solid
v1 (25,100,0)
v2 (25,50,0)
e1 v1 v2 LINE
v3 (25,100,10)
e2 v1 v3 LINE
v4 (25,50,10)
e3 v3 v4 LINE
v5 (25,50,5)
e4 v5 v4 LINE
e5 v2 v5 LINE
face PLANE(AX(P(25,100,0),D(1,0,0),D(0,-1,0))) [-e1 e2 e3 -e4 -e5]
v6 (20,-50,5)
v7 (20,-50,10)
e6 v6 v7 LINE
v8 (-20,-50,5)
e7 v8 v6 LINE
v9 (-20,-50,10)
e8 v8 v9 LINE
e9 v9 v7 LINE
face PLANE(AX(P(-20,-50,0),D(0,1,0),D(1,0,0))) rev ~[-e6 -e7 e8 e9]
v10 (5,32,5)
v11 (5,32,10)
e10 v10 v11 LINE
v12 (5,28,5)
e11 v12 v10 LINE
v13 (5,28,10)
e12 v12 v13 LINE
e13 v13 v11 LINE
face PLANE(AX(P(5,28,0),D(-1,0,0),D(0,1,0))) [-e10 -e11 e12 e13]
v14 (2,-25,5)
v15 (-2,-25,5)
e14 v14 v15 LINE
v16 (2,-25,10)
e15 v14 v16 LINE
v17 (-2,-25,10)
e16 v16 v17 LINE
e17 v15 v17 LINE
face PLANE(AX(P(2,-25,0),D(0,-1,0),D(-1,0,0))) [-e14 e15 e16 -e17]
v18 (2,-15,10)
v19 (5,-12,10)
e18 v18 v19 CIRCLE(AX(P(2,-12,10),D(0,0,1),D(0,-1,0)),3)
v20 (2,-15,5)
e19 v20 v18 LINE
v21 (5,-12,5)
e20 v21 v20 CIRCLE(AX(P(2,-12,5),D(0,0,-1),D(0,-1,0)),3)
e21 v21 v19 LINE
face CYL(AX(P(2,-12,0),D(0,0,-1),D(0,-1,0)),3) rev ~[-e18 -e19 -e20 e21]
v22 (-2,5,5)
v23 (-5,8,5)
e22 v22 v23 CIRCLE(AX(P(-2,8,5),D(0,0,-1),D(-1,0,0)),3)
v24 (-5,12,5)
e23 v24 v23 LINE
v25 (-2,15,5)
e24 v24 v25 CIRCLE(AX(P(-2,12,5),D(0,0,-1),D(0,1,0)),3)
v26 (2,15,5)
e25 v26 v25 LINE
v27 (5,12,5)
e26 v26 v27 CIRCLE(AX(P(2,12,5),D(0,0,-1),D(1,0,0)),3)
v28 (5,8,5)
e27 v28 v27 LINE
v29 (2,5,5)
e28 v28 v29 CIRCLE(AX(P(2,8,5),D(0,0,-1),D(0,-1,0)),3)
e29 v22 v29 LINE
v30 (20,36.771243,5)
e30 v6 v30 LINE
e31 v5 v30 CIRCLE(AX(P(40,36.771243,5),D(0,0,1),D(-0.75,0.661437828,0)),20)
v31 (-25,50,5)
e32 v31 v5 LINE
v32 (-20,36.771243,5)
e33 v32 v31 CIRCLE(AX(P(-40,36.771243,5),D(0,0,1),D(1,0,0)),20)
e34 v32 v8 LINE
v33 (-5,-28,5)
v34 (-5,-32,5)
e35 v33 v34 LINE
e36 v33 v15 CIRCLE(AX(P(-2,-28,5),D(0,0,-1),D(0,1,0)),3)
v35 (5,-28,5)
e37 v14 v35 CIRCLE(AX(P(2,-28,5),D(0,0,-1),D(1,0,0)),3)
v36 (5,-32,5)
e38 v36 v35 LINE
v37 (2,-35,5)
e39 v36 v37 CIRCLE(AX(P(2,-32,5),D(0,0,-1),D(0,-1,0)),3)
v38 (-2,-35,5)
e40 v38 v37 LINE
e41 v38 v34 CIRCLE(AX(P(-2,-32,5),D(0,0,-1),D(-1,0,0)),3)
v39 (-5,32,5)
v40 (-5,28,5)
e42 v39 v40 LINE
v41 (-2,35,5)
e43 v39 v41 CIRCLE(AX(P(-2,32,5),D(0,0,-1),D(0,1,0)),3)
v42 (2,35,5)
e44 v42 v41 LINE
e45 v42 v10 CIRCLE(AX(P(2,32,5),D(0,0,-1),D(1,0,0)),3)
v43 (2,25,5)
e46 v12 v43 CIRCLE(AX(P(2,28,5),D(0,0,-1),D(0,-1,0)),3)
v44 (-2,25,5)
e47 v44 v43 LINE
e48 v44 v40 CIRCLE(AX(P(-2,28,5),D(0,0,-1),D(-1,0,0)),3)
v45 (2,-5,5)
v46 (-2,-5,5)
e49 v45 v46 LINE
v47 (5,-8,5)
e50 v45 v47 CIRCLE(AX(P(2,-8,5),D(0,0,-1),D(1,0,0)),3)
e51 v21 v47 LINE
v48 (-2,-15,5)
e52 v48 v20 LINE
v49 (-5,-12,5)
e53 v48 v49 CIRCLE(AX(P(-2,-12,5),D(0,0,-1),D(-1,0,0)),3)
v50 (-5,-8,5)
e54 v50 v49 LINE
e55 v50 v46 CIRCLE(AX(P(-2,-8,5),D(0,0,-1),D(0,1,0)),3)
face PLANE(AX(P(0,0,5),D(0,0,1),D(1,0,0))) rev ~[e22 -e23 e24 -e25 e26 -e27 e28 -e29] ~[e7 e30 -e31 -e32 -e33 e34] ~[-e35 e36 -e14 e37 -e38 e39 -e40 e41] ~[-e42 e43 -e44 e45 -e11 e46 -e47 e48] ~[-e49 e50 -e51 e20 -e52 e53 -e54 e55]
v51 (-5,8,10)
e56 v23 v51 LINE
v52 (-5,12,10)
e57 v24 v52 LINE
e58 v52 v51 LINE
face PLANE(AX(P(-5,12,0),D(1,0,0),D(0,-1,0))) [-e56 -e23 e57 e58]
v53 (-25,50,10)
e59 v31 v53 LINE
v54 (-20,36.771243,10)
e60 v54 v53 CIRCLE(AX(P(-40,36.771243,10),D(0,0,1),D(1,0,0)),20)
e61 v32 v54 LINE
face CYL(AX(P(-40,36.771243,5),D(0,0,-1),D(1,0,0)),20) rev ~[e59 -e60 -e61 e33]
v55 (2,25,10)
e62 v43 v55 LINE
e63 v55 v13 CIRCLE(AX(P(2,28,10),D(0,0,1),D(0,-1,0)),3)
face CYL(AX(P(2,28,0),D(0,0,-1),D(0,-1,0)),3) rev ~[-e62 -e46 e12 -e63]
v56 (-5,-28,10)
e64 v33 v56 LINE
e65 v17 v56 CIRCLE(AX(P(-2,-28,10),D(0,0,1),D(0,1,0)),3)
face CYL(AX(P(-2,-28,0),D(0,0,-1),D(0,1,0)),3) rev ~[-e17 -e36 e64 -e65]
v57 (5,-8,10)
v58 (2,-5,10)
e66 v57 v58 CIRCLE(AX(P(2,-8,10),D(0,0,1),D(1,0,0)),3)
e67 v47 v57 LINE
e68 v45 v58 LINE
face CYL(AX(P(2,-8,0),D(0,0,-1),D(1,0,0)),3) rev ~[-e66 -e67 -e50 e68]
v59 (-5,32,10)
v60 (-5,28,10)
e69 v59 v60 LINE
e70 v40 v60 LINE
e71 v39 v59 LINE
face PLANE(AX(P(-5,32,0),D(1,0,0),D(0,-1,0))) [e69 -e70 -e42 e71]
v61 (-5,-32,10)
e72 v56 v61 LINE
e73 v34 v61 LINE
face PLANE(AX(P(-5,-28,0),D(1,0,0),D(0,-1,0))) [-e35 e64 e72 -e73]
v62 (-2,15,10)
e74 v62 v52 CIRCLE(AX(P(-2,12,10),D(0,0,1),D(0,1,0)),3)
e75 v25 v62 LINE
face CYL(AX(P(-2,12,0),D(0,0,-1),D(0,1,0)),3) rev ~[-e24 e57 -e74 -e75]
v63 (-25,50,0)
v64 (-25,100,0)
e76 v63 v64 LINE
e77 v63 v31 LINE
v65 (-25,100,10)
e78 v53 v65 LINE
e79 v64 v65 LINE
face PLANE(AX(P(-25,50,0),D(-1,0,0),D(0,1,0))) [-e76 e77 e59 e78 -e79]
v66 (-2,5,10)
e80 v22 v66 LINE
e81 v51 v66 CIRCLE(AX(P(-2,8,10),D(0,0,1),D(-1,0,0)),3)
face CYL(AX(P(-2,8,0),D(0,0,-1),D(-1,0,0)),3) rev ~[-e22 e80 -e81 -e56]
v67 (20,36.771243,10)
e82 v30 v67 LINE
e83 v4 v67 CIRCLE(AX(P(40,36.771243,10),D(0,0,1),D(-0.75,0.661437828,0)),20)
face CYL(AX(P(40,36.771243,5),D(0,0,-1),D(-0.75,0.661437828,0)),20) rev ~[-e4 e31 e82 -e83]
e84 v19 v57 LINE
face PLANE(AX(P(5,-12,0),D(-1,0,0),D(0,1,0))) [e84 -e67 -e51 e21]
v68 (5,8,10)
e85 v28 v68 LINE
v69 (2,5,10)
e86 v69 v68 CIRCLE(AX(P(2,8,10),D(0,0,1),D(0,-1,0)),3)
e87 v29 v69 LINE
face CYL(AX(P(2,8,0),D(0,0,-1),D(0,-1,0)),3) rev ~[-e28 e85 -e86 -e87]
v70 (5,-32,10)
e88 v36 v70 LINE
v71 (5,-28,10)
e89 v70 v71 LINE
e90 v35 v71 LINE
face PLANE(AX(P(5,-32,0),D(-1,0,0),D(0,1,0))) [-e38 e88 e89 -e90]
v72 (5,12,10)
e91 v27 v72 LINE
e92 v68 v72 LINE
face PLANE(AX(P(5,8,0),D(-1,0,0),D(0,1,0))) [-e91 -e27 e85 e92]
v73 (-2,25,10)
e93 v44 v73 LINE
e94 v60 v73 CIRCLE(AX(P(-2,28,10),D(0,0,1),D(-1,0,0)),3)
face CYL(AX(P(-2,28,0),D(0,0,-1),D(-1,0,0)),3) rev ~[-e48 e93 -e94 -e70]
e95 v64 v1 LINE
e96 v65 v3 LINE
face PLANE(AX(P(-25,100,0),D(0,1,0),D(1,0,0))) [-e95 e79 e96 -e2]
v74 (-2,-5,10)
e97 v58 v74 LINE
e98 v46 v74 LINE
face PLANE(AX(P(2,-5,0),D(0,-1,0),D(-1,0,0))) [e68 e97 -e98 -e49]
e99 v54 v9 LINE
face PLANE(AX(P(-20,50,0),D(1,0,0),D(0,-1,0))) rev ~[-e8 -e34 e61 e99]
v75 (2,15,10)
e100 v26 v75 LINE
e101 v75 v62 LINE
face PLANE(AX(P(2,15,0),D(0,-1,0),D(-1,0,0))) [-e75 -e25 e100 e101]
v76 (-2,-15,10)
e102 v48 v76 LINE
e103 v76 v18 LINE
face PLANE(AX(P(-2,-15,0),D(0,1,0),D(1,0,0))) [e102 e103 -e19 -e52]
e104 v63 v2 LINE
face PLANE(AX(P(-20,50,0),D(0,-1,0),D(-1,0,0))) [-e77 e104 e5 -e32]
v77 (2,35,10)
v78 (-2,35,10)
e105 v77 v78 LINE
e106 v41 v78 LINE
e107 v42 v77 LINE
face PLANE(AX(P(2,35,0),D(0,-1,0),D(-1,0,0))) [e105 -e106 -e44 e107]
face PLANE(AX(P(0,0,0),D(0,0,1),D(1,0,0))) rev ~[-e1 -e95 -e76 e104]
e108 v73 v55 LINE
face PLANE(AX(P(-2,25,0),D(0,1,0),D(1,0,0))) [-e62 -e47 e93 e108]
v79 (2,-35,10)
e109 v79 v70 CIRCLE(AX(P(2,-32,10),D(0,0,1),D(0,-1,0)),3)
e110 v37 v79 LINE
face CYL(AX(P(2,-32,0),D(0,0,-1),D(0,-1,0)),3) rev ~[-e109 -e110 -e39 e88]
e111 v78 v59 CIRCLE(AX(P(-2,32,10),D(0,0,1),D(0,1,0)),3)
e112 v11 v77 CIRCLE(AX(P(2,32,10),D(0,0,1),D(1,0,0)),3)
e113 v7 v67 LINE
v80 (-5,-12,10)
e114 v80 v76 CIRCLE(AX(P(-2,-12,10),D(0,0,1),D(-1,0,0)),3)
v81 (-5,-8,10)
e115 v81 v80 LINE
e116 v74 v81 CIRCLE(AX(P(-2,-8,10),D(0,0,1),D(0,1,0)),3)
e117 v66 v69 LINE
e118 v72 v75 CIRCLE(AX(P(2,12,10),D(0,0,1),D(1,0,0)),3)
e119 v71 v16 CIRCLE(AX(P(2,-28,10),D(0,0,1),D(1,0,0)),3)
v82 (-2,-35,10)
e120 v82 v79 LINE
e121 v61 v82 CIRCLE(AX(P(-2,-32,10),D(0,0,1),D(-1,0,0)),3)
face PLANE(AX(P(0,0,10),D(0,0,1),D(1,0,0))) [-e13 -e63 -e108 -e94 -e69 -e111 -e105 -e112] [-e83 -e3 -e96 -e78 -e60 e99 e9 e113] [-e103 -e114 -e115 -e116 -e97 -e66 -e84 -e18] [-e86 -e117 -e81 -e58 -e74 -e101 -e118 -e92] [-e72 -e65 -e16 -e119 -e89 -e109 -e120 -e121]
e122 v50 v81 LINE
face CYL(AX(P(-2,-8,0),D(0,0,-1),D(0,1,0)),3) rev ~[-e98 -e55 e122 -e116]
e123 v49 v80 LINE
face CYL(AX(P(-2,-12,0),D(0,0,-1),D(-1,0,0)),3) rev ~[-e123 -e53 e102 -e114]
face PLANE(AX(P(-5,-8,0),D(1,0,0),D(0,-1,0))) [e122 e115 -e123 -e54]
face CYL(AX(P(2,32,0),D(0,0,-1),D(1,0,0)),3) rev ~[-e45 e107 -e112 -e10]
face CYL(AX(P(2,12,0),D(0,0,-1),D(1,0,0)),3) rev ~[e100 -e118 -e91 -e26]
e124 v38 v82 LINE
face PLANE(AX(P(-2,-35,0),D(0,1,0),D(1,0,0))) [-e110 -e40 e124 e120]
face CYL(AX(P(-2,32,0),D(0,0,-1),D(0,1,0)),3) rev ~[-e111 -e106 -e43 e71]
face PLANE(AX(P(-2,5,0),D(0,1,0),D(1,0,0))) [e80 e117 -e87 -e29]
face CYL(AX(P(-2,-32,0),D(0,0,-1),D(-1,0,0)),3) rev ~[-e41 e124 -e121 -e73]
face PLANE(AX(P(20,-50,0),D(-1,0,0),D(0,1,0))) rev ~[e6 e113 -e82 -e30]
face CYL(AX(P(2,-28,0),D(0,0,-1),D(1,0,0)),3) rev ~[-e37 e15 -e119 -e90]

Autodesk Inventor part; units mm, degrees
ref_plane "YZ Plane" through (0, 0, 0) normal (1, 0, 0) x (0, 1, 0)
ref_plane "XZ Plane" through (0, 0, 0) normal (0, 1, 0) x (-1, 0, 0)
ref_plane "XY Plane" through (0, 0, 0) normal (0, 0, 1) x (1, 0, 0)
sketch "Boceto1" plane through (0, 0, 0) normal (0, 0, 1) x (1, 0, 0)
  line L0 (-20, -50) -> (20, -50)
  line L1 (20, -50) -> (20, 50)
  line L2 (20, 50) -> (-20, 50)
  line L3 (-20, 50) -> (-20, -50)
  line L4 (-20, -50) -> (20, 50) construction
  line L5 (20, -50) -> (-20, 50) construction
  line L6 (-25, 100) -> (25, 100)
  line L7 (25, 100) -> (25, 50)
  line L8 (25, 50) -> (-25, 50)
  line L9 (-25, 50) -> (-25, 100)
  line L10 (-25, 100) -> (25, 50) construction
  line L11 (25, 100) -> (-25, 50) construction
  line L12 (-25, -50) -> (25, -50)
  line L13 (25, -50) -> (25, -100)
  line L14 (25, -100) -> (-25, -100)
  line L15 (-25, -100) -> (-25, -50)
  line L16 (-25, -50) -> (25, -100) construction
  line L17 (25, -50) -> (-25, -100) construction
  line L18 (0, 50) -> (0, 30) construction
  line L19 (0, 30) -> (0, 10) construction
  line L20 (0, 10) -> (0, -10) construction
  line L21 (0, -10) -> (0, -30) construction
  line L22 (0, -30) -> (0, -50) construction
  line L23 (0, 30) -> (0, 30) construction
  line L24 (0, 10) -> (0, 10) construction
  line L25 (0, -10) -> (0, -10) construction
  line L26 (0, -30) -> (0, -30) construction
  line L27 (2, 35) -> (-2, 35)
  line L28 (-5, 32) -> (-5, 28)
  line L29 (-2, 25) -> (2, 25)
  line L30 (5, 28) -> (5, 32)
  line L31 (5, 35) -> (-5, 25) construction
  line L32 (-5, 35) -> (5, 25) construction
  line L33 (2, 15) -> (-2, 15)
  line L34 (-5, 12) -> (-5, 8)
  line L35 (-2, 5) -> (2, 5)
  line L36 (5, 8) -> (5, 12)
  line L37 (5, 15) -> (-5, 5) construction
  line L38 (-5, 15) -> (5, 5) construction
  line L39 (2, -5) -> (-2, -5)
  line L40 (-5, -8) -> (-5, -12)
  line L41 (-2, -15) -> (2, -15)
  line L42 (5, -12) -> (5, -8)
  line L43 (5, -5) -> (-5, -15) construction
  line L44 (-5, -5) -> (5, -15) construction
  line L45 (2, -25) -> (-2, -25)
  line L46 (-5, -28) -> (-5, -32)
  line L47 (-2, -35) -> (2, -35)
  line L48 (5, -32) -> (5, -28)
  line L49 (5, -25) -> (-5, -35) construction
  line L50 (-5, -25) -> (5, -35) construction
  line L51 (0, 30) -> (0, 10) construction
  arc A0 (-2, 35) -> (-5, 32) centre (-2, 32) ccw
  arc A1 (5, 32) -> (2, 35) centre (2, 32) ccw
  arc A2 (2, 25) -> (5, 28) centre (2, 28) ccw
  arc A3 (-5, 28) -> (-2, 25) centre (-2, 28) ccw
  arc A4 (-2, 15) -> (-5, 12) centre (-2, 12) ccw
  arc A5 (-5, 8) -> (-2, 5) centre (-2, 8) ccw
  arc A6 (2, 5) -> (5, 8) centre (2, 8) ccw
  arc A7 (5, 12) -> (2, 15) centre (2, 12) ccw
  arc A8 (5, -8) -> (2, -5) centre (2, -8) ccw
  arc A9 (-2, -5) -> (-5, -8) centre (-2, -8) ccw
  arc A10 (-5, -12) -> (-2, -15) centre (-2, -12) ccw
  arc A11 (2, -15) -> (5, -12) centre (2, -12) ccw
  arc A12 (5, -28) -> (2, -25) centre (2, -28) ccw
  arc A13 (2, -35) -> (5, -32) centre (2, -32) ccw
  arc A14 (-5, -32) -> (-2, -35) centre (-2, -32) ccw
  arc A15 (-2, -25) -> (-5, -28) centre (-2, -28) ccw
  point P0 (0, 0)
  point P1 (0, 75)
  point P2 (0, -75)
  dimension "d0" = 40
  dimension "d1" = 100
  dimension "d2" = 50
  dimension "d3" = 50
  dimension "d4" = 50
  dimension "d5" = 50
  dimension "d6" = 20
  dimension "d7" = 20
  dimension "d8" = 20
  dimension "d9" = 20
  dimension "d10" = 0
  dimension "d11" = 0
  dimension "d12" = 0
  dimension "d13" = 0
  dimension "d25" = 10
  dimension "d26" = 10
  dimension "d27" = 10
  dimension "d28" = 10
  dimension "d29" = 10
  dimension "d30" = 10
  dimension "d31" = 10
  dimension "d32" = 10
  dimension "d33" = 20
  dimension "d34" = 3
extrude "Extrusión1" add sketch "Boceto1" along normal blind 10 contours L3 L2 L1 L0 | L8 L9 L6 L7 L2
extrude "Extrusión2" cut sketch "Boceto1" along normal blind 5 contours L3 L2 L1 L0 | A1 L30 A2 L29 A3 L28 A0 L27 | A7 L36 A6 L35 A5 L34 A4 L33 | A8 L42 A11 L41 A10 L40 A9 L39 | A12 L48 A13 L47 A14 L46 A15 L45
fillet "Empalme3" radius 20 2 edges at (20, 50, 7.5) (-20, 50, 7.5)
properties material "MDF Tablero de fibras de densidad media"
